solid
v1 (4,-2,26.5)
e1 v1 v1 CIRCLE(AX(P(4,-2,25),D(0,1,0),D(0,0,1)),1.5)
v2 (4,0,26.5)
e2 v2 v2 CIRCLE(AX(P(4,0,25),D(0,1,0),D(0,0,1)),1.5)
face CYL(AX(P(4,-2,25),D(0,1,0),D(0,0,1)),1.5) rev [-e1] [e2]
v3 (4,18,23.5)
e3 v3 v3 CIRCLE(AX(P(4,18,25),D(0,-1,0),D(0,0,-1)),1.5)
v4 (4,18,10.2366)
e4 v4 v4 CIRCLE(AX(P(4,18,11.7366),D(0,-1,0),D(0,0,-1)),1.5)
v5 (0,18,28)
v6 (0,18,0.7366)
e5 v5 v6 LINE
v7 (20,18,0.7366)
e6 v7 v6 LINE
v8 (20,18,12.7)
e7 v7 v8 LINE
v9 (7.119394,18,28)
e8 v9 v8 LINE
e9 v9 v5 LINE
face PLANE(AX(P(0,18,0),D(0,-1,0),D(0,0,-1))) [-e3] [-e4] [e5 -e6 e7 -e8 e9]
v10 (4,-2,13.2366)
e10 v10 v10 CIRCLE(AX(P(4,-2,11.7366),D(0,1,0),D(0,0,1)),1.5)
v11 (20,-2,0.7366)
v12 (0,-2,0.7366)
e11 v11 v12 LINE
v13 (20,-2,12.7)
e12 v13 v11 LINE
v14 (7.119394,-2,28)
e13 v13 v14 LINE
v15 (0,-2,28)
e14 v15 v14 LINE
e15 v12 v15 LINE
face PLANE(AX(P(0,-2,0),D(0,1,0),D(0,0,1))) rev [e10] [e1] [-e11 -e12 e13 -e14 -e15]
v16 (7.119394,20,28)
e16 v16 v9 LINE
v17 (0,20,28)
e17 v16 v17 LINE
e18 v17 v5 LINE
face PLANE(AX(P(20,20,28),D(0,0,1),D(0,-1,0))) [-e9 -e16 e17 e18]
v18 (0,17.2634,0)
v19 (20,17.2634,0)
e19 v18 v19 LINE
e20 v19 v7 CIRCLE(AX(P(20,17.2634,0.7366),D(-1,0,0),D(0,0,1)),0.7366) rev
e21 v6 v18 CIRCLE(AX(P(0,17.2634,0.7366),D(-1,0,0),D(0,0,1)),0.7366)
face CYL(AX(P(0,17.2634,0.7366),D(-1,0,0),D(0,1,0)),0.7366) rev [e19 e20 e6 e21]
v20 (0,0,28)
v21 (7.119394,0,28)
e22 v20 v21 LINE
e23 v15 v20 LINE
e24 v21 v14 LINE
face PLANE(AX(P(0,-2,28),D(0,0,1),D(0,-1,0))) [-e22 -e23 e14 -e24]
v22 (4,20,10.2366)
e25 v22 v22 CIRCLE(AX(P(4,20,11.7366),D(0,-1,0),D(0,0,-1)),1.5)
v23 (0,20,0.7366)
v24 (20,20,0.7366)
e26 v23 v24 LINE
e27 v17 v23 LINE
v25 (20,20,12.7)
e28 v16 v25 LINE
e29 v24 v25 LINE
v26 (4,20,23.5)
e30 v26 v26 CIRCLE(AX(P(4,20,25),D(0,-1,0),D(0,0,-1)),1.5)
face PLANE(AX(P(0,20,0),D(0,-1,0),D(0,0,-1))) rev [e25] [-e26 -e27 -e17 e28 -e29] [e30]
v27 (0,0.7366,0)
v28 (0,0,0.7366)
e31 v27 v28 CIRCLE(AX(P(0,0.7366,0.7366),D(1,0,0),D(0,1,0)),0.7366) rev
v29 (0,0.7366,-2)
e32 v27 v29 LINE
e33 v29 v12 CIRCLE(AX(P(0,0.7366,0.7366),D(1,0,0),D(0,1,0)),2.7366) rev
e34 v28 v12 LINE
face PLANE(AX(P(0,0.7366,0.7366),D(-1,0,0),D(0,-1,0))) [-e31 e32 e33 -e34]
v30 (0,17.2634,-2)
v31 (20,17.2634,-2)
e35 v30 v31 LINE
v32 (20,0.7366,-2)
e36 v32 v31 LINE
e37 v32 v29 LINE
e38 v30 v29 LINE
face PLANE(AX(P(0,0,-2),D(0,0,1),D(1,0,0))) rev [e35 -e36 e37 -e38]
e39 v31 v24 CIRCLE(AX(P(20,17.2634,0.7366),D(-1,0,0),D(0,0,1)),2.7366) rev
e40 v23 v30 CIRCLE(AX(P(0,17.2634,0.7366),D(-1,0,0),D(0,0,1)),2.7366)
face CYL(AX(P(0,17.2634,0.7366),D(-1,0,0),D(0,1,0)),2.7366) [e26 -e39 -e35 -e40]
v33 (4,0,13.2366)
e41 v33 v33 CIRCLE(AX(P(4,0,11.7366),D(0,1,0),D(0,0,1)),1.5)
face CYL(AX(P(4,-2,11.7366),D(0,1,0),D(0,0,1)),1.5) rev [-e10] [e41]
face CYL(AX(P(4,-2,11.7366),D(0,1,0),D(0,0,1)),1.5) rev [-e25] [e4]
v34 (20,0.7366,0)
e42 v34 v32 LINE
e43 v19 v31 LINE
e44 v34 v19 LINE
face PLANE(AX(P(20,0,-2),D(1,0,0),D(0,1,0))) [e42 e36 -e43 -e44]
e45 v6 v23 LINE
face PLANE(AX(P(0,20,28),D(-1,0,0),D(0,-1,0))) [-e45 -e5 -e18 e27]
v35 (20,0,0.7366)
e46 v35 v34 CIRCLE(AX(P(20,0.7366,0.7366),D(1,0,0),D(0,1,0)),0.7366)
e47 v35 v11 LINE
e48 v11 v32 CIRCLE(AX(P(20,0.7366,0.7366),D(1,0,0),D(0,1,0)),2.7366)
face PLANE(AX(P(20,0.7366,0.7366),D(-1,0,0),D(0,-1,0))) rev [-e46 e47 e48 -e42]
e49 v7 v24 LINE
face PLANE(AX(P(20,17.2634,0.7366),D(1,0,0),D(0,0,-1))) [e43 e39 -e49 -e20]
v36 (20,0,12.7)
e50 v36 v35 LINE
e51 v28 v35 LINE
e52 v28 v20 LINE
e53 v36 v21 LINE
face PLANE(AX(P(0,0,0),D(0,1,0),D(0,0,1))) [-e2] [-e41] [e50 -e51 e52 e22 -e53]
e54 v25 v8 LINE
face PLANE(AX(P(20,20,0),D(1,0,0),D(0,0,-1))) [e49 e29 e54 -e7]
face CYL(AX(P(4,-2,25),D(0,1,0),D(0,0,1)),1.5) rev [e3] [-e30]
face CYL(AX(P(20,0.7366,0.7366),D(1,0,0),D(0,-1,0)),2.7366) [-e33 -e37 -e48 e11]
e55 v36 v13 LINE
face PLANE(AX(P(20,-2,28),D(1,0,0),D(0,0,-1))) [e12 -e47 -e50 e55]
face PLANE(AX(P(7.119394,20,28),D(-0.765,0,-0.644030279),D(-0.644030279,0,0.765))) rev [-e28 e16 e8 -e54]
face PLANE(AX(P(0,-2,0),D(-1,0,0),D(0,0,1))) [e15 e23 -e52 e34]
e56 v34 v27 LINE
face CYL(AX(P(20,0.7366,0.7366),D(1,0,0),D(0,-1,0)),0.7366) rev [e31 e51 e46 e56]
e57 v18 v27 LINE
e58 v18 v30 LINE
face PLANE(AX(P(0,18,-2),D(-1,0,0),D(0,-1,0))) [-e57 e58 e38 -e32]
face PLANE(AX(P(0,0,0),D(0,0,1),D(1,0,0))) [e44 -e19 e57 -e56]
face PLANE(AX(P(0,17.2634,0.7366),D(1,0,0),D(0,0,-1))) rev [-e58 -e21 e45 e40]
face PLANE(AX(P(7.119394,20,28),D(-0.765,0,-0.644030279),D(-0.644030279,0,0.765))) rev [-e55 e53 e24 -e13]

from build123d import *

# Parameters (mm, degrees)
SCHIZZO1_W                       = 20
SCHIZZO1_H                       = 18
BASE_FLANGIA1_DEPTH              = 2
BORDO_FLANGIA3_STRIP_W           = 9.4732
BORDO_FLANGIA3_STRIP_H           = 2
BORDO_FLANGIA3_STRIP_CUT_DEPTH   = 20
BORDO_FLANGIA3_STRIP_2_W         = 9.4732
BORDO_FLANGIA3_STRIP_2_H         = 2
BORDO_FLANGIA3_STRIP_CUT_2_DEPTH = 20
BORDO_FLANGIA3_DEPTH             = 20
BORDO_FLANGIA3_BEND_DEPTH        = 20
TAGLIO_ESTRUSIONE1_DEPTH         = 41.841155713
TAGLIO_ESTRUSIONE1_DEPTH_BACK    = 41.841155713
TAGLIO_ESTRUSIONE2_DEPTH         = 41.841155713
TAGLIO_ESTRUSIONE2_DEPTH_BACK    = 41.841155713
SCHIZZO20_R                      = 1.5


# Sheet-metal steps are written as plain solids
with BuildPart() as part:
    # Schizzo1 → Base-Flangia1 (new body)
    with BuildSketch(Plane.XY):
        with Locations((10, 9)):
            Rectangle(SCHIZZO1_W, SCHIZZO1_H)
    extrude(amount=-BASE_FLANGIA1_DEPTH)

    # Bordo-Flangia3 strip (across the edge) → Bordo-Flangia3 strip cut (cut)
    with BuildSketch(Plane(origin=(20, 18, 0), x_dir=(0, -1, 0), z_dir=(-1, 0, 0))):
        with Locations((-4, -1)):
            Rectangle(BORDO_FLANGIA3_STRIP_W, BORDO_FLANGIA3_STRIP_H)
    extrude(amount=BORDO_FLANGIA3_STRIP_CUT_DEPTH, mode=Mode.SUBTRACT)

    # Bordo-Flangia3 strip 2 (across the edge) → Bordo-Flangia3 strip cut 2 (cut)
    with BuildSketch(Plane.YZ):
        with Locations((-4, -1)):
            Rectangle(BORDO_FLANGIA3_STRIP_2_W, BORDO_FLANGIA3_STRIP_2_H)
    extrude(amount=BORDO_FLANGIA3_STRIP_CUT_2_DEPTH, mode=Mode.SUBTRACT)

    # Bordo-Flangia3 section (across the edge) → Bordo-Flangia3 (add)
    with BuildSketch(Plane(origin=(20, 18, 0), x_dir=(0, -1, 0), z_dir=(-1, 0, 0))):
        with BuildLine():
            Line((-2, 0.7366), (-2, 28))
            Line((-2, 28), (0, 28))
            Line((0, 28), (0, 0.7366))
            ThreePointArc((0, 0.7366), (0.215745145, 0.215745145), (0.7366, 0))
            Line((0.7366, 0), (0.7366, -2))
            ThreePointArc((0.7366, -2), (-1.198468417, -1.198468417), (-2, 0.7366))
        make_face()
    extrude(amount=BORDO_FLANGIA3_DEPTH)

    # Bordo-Flangia3 section 2 (across the edge) → Bordo-Flangia3 bend (add)
    with BuildSketch(Plane.YZ):
        with BuildLine():
            Line((-2, 0.7366), (-2, 28))
            Line((-2, 28), (0, 28))
            Line((0, 28), (0, 0.7366))
            ThreePointArc((0, 0.7366), (0.215745145, 0.215745145), (0.7366, 0))
            Line((0.7366, 0), (0.7366, -2))
            ThreePointArc((0.7366, -2), (-1.198468417, -1.198468417), (-2, 0.7366))
        make_face()
    extrude(amount=BORDO_FLANGIA3_BEND_DEPTH)

    # Schizzo19 → Taglio-Estrusione1 (cut, two sides: drawn at the far end of the back side and taken through both)
    with BuildSketch(Plane.XZ.offset(2).offset(-TAGLIO_ESTRUSIONE1_DEPTH_BACK)):
        Polygon((7.119394424, 28), (20, 12.7), (20, 28), align=None)
    extrude(amount=TAGLIO_ESTRUSIONE1_DEPTH + TAGLIO_ESTRUSIONE1_DEPTH_BACK, mode=Mode.SUBTRACT)

    # Schizzo20 → Taglio-Estrusione2 (cut, two sides: drawn at the far end of the back side and taken through both)
    with BuildSketch(Plane(origin=(0, 20, 0), x_dir=(1, 0, 0), z_dir=(0, 1, 0)).offset(-TAGLIO_ESTRUSIONE2_DEPTH_BACK)):
        with Locations(Location((4, -11.7366, 0), (0, 0, 270))):
            Circle(SCHIZZO20_R)
        with Locations(Location((4, -25, 0), (0, 0, 270))):
            Circle(SCHIZZO20_R)
    extrude(amount=TAGLIO_ESTRUSIONE2_DEPTH + TAGLIO_ESTRUSIONE2_DEPTH_BACK, mode=Mode.SUBTRACT)


solid = part.part
